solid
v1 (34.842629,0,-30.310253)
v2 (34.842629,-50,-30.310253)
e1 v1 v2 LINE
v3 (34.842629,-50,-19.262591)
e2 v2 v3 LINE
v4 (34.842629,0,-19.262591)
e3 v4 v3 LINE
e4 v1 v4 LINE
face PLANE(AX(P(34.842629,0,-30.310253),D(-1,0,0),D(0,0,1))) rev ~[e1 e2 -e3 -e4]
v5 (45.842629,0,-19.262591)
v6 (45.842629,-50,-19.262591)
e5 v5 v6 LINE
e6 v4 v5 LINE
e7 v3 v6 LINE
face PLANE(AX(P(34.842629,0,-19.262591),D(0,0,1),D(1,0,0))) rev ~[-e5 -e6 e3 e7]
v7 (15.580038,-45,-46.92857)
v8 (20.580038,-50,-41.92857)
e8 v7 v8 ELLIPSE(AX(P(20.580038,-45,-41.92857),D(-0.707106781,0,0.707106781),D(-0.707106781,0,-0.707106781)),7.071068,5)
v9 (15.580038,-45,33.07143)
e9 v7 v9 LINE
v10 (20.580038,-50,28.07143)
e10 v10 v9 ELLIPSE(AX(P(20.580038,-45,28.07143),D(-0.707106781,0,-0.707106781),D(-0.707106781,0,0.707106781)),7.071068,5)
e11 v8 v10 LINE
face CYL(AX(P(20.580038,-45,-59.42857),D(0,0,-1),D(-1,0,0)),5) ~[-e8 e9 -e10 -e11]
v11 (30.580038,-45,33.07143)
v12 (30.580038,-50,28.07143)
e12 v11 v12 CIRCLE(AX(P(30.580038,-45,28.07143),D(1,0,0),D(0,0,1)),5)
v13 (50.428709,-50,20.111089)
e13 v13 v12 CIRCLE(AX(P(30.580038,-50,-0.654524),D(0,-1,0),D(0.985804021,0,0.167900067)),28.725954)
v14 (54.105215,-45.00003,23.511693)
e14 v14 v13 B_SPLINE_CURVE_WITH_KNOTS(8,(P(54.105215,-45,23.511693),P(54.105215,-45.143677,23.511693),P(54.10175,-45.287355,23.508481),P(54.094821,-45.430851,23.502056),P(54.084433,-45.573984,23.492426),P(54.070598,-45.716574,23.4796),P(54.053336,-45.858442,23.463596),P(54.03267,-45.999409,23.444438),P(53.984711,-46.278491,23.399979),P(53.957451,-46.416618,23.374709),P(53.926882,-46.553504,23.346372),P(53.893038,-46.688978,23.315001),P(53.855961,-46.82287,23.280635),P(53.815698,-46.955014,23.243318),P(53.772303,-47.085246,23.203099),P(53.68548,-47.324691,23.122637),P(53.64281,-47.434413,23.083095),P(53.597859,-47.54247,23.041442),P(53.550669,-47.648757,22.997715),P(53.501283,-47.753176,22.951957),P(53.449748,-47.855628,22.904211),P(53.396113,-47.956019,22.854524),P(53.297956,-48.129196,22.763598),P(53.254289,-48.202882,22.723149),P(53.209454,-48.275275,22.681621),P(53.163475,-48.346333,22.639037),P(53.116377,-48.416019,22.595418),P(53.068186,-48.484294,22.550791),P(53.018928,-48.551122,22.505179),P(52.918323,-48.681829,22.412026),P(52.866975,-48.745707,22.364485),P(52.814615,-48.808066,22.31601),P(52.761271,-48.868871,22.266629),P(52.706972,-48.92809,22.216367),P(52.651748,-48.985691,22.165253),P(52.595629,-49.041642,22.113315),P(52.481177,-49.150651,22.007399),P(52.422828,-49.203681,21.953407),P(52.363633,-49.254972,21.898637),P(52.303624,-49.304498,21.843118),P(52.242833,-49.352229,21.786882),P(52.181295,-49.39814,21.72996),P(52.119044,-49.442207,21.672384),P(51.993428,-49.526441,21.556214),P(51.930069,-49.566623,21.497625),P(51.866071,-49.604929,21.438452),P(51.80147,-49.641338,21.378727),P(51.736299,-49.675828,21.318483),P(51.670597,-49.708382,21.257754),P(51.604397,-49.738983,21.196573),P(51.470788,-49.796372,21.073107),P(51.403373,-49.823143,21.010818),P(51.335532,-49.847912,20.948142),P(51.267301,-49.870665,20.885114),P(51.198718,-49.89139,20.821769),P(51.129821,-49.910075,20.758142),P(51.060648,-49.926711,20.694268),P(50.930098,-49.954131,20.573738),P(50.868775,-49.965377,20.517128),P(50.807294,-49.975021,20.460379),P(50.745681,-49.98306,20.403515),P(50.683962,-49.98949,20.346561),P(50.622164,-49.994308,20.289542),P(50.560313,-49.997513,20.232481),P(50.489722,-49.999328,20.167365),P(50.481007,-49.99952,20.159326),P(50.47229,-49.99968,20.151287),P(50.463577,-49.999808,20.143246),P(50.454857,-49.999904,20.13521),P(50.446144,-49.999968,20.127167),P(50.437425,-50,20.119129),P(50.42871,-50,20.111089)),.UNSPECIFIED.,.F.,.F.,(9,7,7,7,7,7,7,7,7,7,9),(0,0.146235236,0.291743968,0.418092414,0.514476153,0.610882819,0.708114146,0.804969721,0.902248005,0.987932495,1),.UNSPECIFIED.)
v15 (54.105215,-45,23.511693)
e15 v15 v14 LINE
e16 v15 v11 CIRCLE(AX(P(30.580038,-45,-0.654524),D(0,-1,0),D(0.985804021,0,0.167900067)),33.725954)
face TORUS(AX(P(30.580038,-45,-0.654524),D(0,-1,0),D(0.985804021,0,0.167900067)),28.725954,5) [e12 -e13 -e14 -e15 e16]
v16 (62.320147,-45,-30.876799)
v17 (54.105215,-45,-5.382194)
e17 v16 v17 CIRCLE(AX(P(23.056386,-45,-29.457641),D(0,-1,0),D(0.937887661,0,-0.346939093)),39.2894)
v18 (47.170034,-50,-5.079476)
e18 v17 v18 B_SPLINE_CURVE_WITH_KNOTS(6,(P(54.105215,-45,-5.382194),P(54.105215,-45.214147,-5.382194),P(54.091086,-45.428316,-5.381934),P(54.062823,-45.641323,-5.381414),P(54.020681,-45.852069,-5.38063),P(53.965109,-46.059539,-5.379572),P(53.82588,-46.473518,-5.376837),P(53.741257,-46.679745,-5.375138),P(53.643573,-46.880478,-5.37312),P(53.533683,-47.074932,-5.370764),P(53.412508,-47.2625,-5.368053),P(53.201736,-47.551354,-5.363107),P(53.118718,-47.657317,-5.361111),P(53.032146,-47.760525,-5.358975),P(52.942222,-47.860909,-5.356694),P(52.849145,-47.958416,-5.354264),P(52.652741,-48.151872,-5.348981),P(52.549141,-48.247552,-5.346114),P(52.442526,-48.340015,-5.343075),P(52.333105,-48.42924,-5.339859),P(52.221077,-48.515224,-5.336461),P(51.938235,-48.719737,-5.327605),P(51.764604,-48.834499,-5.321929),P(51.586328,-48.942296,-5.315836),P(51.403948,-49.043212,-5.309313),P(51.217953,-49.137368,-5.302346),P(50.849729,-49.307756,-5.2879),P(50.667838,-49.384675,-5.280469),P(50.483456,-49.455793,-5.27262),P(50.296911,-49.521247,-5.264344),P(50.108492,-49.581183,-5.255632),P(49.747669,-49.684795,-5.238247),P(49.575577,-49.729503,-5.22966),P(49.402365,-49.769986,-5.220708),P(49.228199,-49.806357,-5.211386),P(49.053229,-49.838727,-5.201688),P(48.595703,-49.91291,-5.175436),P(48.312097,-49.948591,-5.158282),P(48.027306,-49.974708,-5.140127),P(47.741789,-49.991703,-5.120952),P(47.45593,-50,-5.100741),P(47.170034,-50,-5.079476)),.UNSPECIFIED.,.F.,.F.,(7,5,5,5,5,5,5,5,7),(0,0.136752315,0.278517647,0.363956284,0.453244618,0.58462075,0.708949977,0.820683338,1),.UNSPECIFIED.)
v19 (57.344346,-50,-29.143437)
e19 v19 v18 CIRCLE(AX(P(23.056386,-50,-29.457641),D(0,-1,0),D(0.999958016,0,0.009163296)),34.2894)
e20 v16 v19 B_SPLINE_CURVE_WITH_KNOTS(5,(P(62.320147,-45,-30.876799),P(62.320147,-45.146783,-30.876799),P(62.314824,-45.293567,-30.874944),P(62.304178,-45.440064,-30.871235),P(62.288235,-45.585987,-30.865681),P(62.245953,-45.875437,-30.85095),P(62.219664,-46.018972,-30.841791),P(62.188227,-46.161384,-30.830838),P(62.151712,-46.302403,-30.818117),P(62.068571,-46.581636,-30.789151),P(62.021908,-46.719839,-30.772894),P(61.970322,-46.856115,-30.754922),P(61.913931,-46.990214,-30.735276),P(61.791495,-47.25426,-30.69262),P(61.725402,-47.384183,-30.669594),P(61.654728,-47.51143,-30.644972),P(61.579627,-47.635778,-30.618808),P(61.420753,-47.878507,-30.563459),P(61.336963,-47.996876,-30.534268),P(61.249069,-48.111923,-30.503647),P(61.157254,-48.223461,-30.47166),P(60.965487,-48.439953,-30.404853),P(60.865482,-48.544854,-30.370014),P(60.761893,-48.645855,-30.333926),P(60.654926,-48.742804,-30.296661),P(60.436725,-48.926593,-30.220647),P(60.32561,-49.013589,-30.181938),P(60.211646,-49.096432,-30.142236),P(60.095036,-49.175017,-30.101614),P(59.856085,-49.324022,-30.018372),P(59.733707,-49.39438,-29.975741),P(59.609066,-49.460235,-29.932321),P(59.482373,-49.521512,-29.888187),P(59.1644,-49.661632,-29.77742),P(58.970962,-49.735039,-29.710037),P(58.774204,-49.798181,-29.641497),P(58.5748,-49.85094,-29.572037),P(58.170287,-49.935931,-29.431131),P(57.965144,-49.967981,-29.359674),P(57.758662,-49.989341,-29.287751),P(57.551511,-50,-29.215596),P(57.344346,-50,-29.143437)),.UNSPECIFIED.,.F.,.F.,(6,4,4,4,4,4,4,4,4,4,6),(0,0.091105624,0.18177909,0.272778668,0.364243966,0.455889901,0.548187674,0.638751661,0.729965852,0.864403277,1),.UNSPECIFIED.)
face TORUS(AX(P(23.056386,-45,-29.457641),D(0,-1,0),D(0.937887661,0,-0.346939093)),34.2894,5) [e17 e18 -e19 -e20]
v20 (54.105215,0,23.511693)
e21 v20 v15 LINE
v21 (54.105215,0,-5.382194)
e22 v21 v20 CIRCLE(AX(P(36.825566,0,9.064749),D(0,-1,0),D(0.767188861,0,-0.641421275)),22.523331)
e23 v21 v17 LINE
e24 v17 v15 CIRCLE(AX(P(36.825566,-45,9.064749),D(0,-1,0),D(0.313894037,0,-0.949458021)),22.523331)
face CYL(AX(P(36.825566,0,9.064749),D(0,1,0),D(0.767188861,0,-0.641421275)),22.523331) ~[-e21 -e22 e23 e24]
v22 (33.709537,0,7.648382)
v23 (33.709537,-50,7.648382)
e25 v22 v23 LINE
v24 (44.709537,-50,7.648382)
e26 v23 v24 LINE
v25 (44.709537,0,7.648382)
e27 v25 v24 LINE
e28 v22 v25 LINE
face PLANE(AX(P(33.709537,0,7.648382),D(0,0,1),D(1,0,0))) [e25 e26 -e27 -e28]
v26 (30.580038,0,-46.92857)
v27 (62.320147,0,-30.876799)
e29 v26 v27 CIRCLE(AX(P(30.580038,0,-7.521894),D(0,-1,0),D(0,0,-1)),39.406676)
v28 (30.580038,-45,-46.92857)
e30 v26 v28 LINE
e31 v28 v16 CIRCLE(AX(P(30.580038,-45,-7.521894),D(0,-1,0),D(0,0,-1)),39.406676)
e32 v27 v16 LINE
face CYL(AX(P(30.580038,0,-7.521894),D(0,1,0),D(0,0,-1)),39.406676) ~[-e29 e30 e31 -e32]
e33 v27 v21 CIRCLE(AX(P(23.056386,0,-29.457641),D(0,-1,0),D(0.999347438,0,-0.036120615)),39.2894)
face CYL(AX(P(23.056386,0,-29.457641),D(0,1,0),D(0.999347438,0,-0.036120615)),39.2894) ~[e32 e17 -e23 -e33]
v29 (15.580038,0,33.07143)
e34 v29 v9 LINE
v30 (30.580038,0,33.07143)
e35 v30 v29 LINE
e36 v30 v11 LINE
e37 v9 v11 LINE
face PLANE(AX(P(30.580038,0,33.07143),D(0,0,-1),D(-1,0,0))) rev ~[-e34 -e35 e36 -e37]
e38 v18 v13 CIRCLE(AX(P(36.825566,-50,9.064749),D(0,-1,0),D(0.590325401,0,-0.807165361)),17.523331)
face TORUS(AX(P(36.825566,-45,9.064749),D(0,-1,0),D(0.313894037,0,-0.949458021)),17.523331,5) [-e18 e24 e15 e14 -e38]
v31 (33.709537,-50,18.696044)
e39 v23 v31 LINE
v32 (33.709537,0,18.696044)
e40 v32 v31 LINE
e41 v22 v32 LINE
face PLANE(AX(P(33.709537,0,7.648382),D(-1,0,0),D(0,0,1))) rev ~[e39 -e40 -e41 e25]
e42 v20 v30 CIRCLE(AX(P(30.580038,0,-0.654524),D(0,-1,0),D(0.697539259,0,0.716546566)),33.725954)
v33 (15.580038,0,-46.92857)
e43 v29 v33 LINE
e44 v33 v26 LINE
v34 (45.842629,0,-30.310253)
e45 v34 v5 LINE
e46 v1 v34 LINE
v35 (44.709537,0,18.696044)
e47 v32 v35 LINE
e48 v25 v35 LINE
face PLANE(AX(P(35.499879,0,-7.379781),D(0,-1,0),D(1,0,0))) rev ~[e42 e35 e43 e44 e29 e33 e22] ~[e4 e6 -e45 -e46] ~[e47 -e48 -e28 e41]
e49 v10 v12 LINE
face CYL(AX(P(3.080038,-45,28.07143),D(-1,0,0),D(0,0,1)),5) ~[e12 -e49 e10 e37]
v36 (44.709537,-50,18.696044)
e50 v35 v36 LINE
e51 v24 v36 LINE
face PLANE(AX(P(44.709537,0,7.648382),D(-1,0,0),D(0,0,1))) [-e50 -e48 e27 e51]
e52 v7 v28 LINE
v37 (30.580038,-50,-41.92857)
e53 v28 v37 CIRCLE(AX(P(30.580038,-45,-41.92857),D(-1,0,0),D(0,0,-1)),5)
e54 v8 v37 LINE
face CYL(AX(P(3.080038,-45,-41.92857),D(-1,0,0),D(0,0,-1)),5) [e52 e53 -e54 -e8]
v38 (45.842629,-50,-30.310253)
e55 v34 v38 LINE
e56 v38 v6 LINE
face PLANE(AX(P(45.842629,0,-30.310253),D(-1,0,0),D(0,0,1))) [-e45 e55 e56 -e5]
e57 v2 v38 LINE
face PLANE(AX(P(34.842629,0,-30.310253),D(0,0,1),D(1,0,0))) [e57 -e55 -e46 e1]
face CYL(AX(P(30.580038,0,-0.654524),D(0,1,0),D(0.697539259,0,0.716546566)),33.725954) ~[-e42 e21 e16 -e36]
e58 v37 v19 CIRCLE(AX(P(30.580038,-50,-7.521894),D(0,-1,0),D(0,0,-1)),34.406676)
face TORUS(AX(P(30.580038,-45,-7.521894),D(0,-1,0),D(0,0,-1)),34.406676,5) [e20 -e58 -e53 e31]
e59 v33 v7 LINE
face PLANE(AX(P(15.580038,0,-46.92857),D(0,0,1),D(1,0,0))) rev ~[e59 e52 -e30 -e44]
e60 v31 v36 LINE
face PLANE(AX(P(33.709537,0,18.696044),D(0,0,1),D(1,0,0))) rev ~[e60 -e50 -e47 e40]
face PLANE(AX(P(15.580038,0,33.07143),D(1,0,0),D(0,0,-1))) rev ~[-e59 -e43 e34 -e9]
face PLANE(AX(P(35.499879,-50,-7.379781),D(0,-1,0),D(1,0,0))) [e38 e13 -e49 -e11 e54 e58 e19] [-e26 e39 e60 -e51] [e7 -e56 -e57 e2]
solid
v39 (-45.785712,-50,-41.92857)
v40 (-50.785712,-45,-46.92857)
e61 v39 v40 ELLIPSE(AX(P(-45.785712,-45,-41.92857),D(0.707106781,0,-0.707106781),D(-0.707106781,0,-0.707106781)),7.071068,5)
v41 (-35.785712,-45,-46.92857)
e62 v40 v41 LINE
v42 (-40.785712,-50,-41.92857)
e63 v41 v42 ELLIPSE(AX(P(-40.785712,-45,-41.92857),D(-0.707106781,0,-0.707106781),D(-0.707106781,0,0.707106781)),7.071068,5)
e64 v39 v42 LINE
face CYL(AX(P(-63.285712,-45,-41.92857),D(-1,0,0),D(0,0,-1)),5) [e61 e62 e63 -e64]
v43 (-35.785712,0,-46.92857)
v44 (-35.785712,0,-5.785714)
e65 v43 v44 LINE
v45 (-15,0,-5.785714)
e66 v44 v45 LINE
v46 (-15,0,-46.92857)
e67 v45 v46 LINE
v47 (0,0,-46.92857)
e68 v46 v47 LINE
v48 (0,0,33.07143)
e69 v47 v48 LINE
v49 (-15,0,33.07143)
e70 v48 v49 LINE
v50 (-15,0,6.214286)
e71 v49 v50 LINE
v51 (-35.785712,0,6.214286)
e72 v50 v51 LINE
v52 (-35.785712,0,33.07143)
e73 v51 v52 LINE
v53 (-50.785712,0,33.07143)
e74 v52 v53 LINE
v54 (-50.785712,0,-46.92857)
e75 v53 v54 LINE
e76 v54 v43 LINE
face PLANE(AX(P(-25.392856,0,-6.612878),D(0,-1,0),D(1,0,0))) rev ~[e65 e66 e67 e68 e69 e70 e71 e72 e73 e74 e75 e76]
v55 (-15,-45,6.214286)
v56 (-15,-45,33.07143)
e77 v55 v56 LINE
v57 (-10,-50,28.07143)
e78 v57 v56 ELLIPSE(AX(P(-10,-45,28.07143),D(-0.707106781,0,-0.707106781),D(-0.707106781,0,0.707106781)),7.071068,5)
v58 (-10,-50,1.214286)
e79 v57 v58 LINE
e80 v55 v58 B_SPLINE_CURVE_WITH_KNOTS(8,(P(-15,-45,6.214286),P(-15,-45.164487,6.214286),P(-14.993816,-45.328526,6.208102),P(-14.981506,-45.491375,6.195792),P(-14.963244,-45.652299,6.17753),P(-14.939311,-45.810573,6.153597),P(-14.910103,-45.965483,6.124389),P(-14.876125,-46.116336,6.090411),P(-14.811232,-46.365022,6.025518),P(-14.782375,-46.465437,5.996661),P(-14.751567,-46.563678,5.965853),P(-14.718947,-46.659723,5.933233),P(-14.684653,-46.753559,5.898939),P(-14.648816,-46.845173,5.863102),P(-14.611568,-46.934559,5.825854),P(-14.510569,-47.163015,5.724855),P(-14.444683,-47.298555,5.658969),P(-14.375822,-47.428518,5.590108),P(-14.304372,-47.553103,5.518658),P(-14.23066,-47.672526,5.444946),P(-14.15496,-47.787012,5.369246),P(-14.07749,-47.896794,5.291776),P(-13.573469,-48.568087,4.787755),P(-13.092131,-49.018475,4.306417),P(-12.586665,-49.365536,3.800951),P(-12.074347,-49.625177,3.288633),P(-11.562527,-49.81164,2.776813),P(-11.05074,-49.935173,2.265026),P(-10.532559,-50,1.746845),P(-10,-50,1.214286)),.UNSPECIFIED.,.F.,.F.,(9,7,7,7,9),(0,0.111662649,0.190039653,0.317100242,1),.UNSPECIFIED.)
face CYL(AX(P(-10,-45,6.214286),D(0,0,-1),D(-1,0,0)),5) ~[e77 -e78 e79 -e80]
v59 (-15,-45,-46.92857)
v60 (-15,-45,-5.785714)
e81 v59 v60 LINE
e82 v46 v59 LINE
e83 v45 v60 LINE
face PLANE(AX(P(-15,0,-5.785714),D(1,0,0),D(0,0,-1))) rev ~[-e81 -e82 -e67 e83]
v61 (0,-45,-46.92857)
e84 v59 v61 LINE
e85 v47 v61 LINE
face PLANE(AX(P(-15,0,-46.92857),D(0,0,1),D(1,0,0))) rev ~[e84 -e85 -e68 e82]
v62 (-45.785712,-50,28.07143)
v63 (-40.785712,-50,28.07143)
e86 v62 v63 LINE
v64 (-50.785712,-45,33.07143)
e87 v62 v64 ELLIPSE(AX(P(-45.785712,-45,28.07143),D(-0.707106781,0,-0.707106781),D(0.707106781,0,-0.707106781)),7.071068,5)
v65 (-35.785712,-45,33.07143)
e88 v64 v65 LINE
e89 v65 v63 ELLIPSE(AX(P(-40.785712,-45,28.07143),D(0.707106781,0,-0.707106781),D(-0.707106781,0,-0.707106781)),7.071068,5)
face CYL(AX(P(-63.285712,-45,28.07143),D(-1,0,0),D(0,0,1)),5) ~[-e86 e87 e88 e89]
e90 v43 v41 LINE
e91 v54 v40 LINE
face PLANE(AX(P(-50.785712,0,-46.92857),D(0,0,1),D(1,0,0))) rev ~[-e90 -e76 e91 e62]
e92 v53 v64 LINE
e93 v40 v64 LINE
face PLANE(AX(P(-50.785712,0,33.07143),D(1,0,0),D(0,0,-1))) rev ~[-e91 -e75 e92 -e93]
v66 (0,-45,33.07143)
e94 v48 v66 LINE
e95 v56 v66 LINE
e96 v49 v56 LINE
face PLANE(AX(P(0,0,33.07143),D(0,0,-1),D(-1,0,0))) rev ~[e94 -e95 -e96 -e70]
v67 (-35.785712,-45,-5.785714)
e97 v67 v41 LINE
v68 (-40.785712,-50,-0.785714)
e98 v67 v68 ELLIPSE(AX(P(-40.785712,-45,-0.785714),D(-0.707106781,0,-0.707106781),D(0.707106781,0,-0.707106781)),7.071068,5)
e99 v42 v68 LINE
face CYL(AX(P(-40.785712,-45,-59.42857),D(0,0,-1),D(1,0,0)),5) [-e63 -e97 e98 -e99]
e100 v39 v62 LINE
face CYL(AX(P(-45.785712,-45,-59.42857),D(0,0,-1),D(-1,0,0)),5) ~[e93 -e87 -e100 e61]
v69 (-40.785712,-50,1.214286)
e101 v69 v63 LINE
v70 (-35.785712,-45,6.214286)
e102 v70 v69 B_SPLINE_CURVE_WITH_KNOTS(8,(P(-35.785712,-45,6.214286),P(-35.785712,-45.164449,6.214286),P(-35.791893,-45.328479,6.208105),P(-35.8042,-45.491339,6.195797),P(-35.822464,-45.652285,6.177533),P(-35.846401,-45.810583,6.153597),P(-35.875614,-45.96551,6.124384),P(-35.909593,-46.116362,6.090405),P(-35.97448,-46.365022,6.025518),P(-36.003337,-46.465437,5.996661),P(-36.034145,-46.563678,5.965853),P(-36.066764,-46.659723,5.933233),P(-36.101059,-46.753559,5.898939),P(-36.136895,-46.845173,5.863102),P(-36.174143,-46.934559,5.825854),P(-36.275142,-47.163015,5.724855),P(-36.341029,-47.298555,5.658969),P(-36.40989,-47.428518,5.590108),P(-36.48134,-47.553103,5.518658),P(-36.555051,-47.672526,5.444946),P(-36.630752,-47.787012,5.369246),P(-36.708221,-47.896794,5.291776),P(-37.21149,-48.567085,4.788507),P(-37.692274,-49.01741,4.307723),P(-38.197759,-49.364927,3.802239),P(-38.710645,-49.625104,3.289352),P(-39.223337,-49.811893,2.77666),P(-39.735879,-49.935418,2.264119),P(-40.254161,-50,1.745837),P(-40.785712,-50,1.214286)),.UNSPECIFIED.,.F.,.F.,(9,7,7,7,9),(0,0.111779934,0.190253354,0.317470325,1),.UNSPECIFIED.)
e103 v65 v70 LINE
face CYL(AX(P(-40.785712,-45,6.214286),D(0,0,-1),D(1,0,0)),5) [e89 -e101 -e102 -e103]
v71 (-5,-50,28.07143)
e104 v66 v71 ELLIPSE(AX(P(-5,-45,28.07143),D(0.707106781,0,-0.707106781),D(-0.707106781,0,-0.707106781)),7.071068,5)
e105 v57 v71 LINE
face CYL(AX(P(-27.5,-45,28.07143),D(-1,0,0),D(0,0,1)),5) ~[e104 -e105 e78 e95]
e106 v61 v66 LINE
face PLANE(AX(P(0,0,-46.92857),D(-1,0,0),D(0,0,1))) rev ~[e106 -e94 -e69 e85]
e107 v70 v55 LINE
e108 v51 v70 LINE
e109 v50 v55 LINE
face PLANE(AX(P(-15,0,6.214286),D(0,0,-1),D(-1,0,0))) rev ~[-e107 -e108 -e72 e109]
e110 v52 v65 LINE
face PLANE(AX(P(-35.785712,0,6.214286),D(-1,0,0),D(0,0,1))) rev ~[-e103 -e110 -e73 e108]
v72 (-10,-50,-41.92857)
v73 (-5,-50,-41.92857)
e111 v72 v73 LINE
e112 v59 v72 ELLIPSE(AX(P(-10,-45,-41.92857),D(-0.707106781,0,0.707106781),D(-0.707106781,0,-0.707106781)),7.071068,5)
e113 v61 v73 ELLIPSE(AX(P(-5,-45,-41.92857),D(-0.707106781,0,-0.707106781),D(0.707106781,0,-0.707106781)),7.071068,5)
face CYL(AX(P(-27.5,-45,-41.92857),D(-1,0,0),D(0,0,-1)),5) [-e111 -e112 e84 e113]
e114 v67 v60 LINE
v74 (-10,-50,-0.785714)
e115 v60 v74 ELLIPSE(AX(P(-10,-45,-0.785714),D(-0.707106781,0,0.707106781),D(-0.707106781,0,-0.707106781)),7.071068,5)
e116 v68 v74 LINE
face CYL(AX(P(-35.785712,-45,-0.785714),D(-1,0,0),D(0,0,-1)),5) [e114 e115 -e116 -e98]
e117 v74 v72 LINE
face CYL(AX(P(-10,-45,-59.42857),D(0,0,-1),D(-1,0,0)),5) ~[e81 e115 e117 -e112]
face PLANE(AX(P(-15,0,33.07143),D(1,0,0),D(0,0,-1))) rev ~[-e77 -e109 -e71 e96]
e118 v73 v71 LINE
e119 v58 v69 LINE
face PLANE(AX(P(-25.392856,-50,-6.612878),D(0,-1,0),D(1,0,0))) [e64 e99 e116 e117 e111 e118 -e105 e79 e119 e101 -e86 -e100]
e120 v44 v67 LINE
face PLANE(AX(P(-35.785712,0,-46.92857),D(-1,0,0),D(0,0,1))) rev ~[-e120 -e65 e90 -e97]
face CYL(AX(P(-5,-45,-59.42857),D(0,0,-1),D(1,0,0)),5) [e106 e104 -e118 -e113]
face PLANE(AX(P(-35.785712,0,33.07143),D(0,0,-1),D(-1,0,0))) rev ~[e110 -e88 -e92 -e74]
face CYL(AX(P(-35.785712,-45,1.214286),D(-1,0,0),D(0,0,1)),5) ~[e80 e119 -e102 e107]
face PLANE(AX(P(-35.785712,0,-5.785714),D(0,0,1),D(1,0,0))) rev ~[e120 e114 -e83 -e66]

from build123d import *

# Parameters (mm, degrees)
F1_DEPTH       = 50
F0_W           = 11
F0_H           = 11.0476613045
F0_H_2         = 11.0476617701
F2_T1_DEPTH    = 105
F2_T3_DEPTH    = 40
F2_T5_DEPTH    = 39.3571444373
F2_T7_DEPTH    = 40
F2_T9_DEPTH    = 53.6428555627
F2_T11_DEPTH   = 20.7857115482
F2_T16_DEPTH   = 51.8571444373
F2_T21_DEPTH   = 66.1428555627
F2_T26_DEPTH   = 66.1428555627
F2_T31_DEPTH   = 51.8571444373
F2_T37_DEPTH   = 51.8571444373
F2_T42_DEPTH   = 33.2857115482
F2_T49_DEPTH   = 66.1428555627
F2_T54_DEPTH   = 33.2857115482
F2_T61_DEPTH   = 33.2857115482
F2_T65_DEPTH   = 66.1428555627
F2_T73_DEPTH   = 51.8571444373
F2_T78_DEPTH   = 33.2857115482
F2_2_T1_DEPTH  = 27.5
F2_2_T3_DEPTH  = 105
F2_2_T6_ANGLE  = 80.3342530923
F2_2_T10_ANGLE = 143.4118786012
F2_2_S11_R     = 39.2893999544
F2_2_T12_DEPTH = 27
F2_2_T16_ANGLE = 76.3206243735
F2_2_S17_R     = 22.5233307718
F2_2_T18_DEPTH = 29
F2_2_T20_ANGLE = 71.8308511896
F2_2_T25_ANGLE = 76.3206243735
F2_2_S26_R     = 22.5233307718
F2_2_T27_DEPTH = 29
F2_2_T30_ANGLE = 143.4118786012
F2_2_S31_R     = 39.2893999544
F2_2_T32_DEPTH = 27


# Not quite as in the source:
# - a fillet or chamfer that OpenCascade refuses, or shapes differently, is made with other operations: its cross-section is extruded or revolved along the edge and cut away or added


with BuildPart() as f1:
    # F0 (on Front) → F1 (new body)
    with BuildSketch(Plane.XZ):
        Polygon((-35.7857115482, 33.0714304233), (-50.7857115482, 33.0714304233), (-50.7857115482, -46.9285695767), (-35.7857115482, -46.9285695767), (-35.7857115482, -5.785714014), (-15, -5.785714014), (-15, -46.9285695767), (0, -46.9285695767), (0, 33.0714304233), (-15, 33.0714304233), (-15, 6.214285986), (-35.7857115482, 6.214285986), align=None)
    extrude(amount=F1_DEPTH)

    # F2: fillet of radius 5 on 12 edges, made by hand

    # F2_s2 → F2_t1 (cut)
    with BuildSketch(Plane.XY.offset(-59.4285695767)):
        with BuildLine():
            ThreePointArc((0, -45), (-1.4644660941, -48.5355339059), (-5, -50))
            Line((-5, -50), (0, -50))
            Line((0, -50), (0, -45))
        make_face()
        with BuildLine():
            ThreePointArc((-50.7857115482, -45), (-49.3212454541, -48.5355339059), (-45.7857115482, -50))
            Line((-45.7857115482, -50), (-50.7857115482, -50))
            Line((-50.7857115482, -50), (-50.7857115482, -45))
        make_face()
    extrude(amount=F2_T1_DEPTH, mode=Mode.SUBTRACT)

    # F2_s4 → F2_t3 (cut)
    with BuildSketch(Plane.YZ.offset(-27.5)):
        with BuildLine():
            ThreePointArc((-45, 33.0714304233), (-48.5355339059, 31.6069643292), (-50, 28.0714304233))
            Line((-50, 28.0714304233), (-50, 33.0714304233))
            Line((-50, 33.0714304233), (-45, 33.0714304233))
        make_face()
        with BuildLine():
            ThreePointArc((-45, -46.9285695767), (-48.5355339059, -45.4641034826), (-50, -41.9285695767))
            Line((-50, -41.9285695767), (-50, -46.9285695767))
            Line((-50, -46.9285695767), (-45, -46.9285695767))
        make_face()
    extrude(amount=F2_T3_DEPTH, mode=Mode.SUBTRACT)

    # F2_s6 → F2_t5 (cut)
    with BuildSketch(Plane.XY.offset(6.214285986)):
        with BuildLine():
            ThreePointArc((-35.7857115482, -45), (-37.2501776423, -48.5355339059), (-40.7857115482, -50))
            Line((-40.7857115482, -50), (-35.7857115482, -50))
            Line((-35.7857115482, -50), (-35.7857115482, -45))
        make_face()
        with BuildLine():
            ThreePointArc((-15, -45), (-13.5355339059, -48.5355339059), (-10, -50))
            Line((-10, -50), (-15, -50))
            Line((-15, -50), (-15, -45))
        make_face()
    extrude(amount=F2_T5_DEPTH, mode=Mode.SUBTRACT)

    # F2_s8 → F2_t7 (cut)
    with BuildSketch(Plane.YZ.offset(-63.2857115482)):
        with BuildLine():
            ThreePointArc((-45, 33.0714304233), (-48.5355339059, 31.6069643292), (-50, 28.0714304233))
            Line((-50, 28.0714304233), (-50, 33.0714304233))
            Line((-50, 33.0714304233), (-45, 33.0714304233))
        make_face()
        with BuildLine():
            ThreePointArc((-45, -46.9285695767), (-48.5355339059, -45.4641034826), (-50, -41.9285695767))
            Line((-50, -41.9285695767), (-50, -46.9285695767))
            Line((-50, -46.9285695767), (-45, -46.9285695767))
        make_face()
    extrude(amount=F2_T7_DEPTH, mode=Mode.SUBTRACT)

    # F2_s10 → F2_t9 (cut)
    with BuildSketch(Plane.XY.offset(-59.4285695767)):
        with BuildLine():
            ThreePointArc((-35.7857115482, -45), (-37.2501776423, -48.5355339059), (-40.7857115482, -50))
            Line((-40.7857115482, -50), (-35.7857115482, -50))
            Line((-35.7857115482, -50), (-35.7857115482, -45))
        make_face()
        with BuildLine():
            ThreePointArc((-15, -45), (-13.5355339059, -48.5355339059), (-10, -50))
            Line((-10, -50), (-15, -50))
            Line((-15, -50), (-15, -45))
        make_face()
    extrude(amount=F2_T9_DEPTH, mode=Mode.SUBTRACT)

    # F2_s12 → F2_t11 (cut)
    with BuildSketch(Plane.YZ.offset(-35.7857115482)):
        with BuildLine():
            ThreePointArc((-45, -5.785714014), (-48.5355339059, -4.3212479199), (-50, -0.785714014))
            Line((-50, -0.785714014), (-50, -5.785714014))
            Line((-50, -5.785714014), (-45, -5.785714014))
        make_face()
        with BuildLine():
            ThreePointArc((-45, 6.214285986), (-48.5355339059, 4.749819892), (-50, 1.214285986))
            Line((-50, 1.214285986), (-50, 6.214285986))
            Line((-50, 6.214285986), (-45, 6.214285986))
        make_face()
    extrude(amount=F2_T11_DEPTH, mode=Mode.SUBTRACT)


with BuildPart() as f1b:
    # F0 (on Front) → F1, piece 2 (new body)
    with BuildSketch(Plane.XZ):
        with BuildLine():
            Line((30.5800376087, 33.0714304233), (15.5800376087, 33.0714304233))
            Line((15.5800376087, 33.0714304233), (15.5800376087, -46.9285695767))
            Line((15.5800376087, -46.9285695767), (30.5800376087, -46.9285695767))
            ThreePointArc((30.5800376087, -46.9285695767), (48.3641167152, -42.6873971764), (62.3201467097, -30.8767985553))
            ThreePointArc((62.3201467097, -30.8767985553), (60.4523586567, -17.4078220357), (54.1052147746, -5.3821941838))
            ThreePointArc((54.1052147746, -5.3821941838), (59.3488970656, 9.0647493489), (54.1052147746, 23.5116928816))
            ThreePointArc((54.1052147746, 23.5116928816), (43.2767157427, 30.5902254056), (30.5800376087, 33.0714304233))
        make_face()
        with Locations((40.3426289856, -24.7864220291)):
            Rectangle(F0_W, F0_H, mode=Mode.SUBTRACT)
        with Locations((39.2095372379, 13.1722127553)):
            Rectangle(F0_W, F0_H_2, mode=Mode.SUBTRACT)
    extrude(amount=F1_DEPTH)

    # F2#2: fillet of radius 5 on 7 edges, made by hand

    # F2_2_s2 → F2_2_t1 (cut)
    with BuildSketch(Plane.YZ.offset(3.0800376087)):
        with BuildLine():
            ThreePointArc((-45, -46.9285695767), (-48.5355339059, -45.4641034826), (-50, -41.9285695767))
            Line((-50, -41.9285695767), (-50, -46.9285695767))
            Line((-50, -46.9285695767), (-45, -46.9285695767))
        make_face()
        with BuildLine():
            ThreePointArc((-45, 33.0714304233), (-48.5355339059, 31.6069643292), (-50, 28.0714304233))
            Line((-50, 28.0714304233), (-50, 33.0714304233))
            Line((-50, 33.0714304233), (-45, 33.0714304233))
        make_face()
    extrude(amount=F2_2_T1_DEPTH, mode=Mode.SUBTRACT)

    # F2_2_s4 → F2_2_t3 (cut)
    with BuildSketch(Plane.XY.offset(-59.4285695767)):
        with BuildLine():
            ThreePointArc((15.5800376087, -45), (17.0445037028, -48.5355339059), (20.5800376087, -50))
            Line((20.5800376087, -50), (15.5800376087, -50))
            Line((15.5800376087, -50), (15.5800376087, -45))
        make_face()
    extrude(amount=F2_2_T3_DEPTH, mode=Mode.SUBTRACT)

    # F2_2_s5 → F2_2_t6 (revolve, cut)
    with BuildSketch(Plane(origin=(0.9703990257, 0, -5.6975752164), x_dir=(0, 1, 0), z_dir=(0.1679000671, 0, -0.9858040208))):
        with BuildLine():
            ThreePointArc((-45, 63.7619837133), (-48.5355339059, 62.2975176192), (-50, 58.7619837133))
            Line((-50, 58.7619837133), (-50, 63.7619837133))
            Line((-50, 63.7619837133), (-45, 63.7619837133))
        make_face()
    revolve(axis=Axis((30.5800376087, -50, -0.6545238583), (0, -1, 0)), revolution_arc=F2_2_T6_ANGLE, mode=Mode.SUBTRACT)


with BuildPart() as f2_tool14:
    # F2_s15 → F2_t16 (new body)
    with BuildSketch(Plane.XY.offset(-6.285714014)):
        with BuildLine():
            ThreePointArc((-35.7857115482, -45), (-37.2501776423, -48.5355339059), (-40.7857115482, -50))
            Line((-40.7857115482, -50), (-35.7857115482, -50))
            Line((-35.7857115482, -50), (-35.7857115482, -45))
        make_face()
    extrude(amount=F2_T16_DEPTH)

    split(bisect_by=Plane.XY.offset(-5.785714014), keep=Keep.BOTTOM)


with BuildPart() as f1_1:
    add(f1.part)

    # F2_t13: cut F2_tool14
    add(f2_tool14.part, mode=Mode.SUBTRACT)


with BuildPart() as f2_tool19:
    # F2_s20 → F2_t21 (new body)
    with BuildSketch(Plane.XY.offset(-59.4285695767)):
        with BuildLine():
            ThreePointArc((-35.7857115482, -45), (-37.2501776423, -48.5355339059), (-40.7857115482, -50))
            Line((-40.7857115482, -50), (-35.7857115482, -50))
            Line((-35.7857115482, -50), (-35.7857115482, -45))
        make_face()
    extrude(amount=F2_T21_DEPTH)

    split(bisect_by=Plane.XY.offset(6.214285986), keep=Keep.TOP)


with BuildPart() as f1_2:
    add(f1_1.part)

    # F2_t18: cut F2_tool19
    add(f2_tool19.part, mode=Mode.SUBTRACT)


with BuildPart() as f2_tool24:
    # F2_s25 → F2_t26 (new body)
    with BuildSketch(Plane.XY.offset(6.714285986)):
        with BuildLine():
            ThreePointArc((-15, -45), (-13.5355339059, -48.5355339059), (-10, -50))
            Line((-10, -50), (-15, -50))
            Line((-15, -50), (-15, -45))
        make_face()
    extrude(amount=-F2_T26_DEPTH)

    split(bisect_by=Plane.XY.offset(6.214285986), keep=Keep.TOP)


with BuildPart() as f1_3:
    add(f1_2.part)

    # F2_t23: cut F2_tool24
    add(f2_tool24.part, mode=Mode.SUBTRACT)


with BuildPart() as f2_tool29:
    # F2_s30 → F2_t31 (new body)
    with BuildSketch(Plane.XY.offset(45.5714304233)):
        with BuildLine():
            ThreePointArc((-15, -45), (-13.5355339059, -48.5355339059), (-10, -50))
            Line((-10, -50), (-15, -50))
            Line((-15, -50), (-15, -45))
        make_face()
    extrude(amount=-F2_T31_DEPTH)

    split(bisect_by=Plane.XY.offset(-5.785714014), keep=Keep.BOTTOM)


with BuildPart() as f1_4:
    add(f1_3.part)

    # F2_t28: cut F2_tool29
    add(f2_tool29.part, mode=Mode.SUBTRACT)


with BuildPart() as f2_tool35:
    # F2_s36 → F2_t37 (new body)
    with BuildSketch(Plane.XY.offset(-6.285714014)):
        with BuildLine():
            ThreePointArc((-35.7857115482, -45), (-37.2501776423, -48.5355339059), (-40.7857115482, -50))
            Line((-40.7857115482, -50), (-35.7857115482, -50))
            Line((-35.7857115482, -50), (-35.7857115482, -45))
        make_face()
    extrude(amount=F2_T37_DEPTH)

    split(bisect_by=Plane.XY.offset(6.214285986), keep=Keep.BOTTOM)

    split(bisect_by=Plane.XY.offset(-5.785714014), keep=Keep.TOP)


with BuildPart() as f2_tool40:
    # F2_s41 → F2_t42 (new body)
    with BuildSketch(Plane.YZ.offset(-15)):
        with BuildLine():
            ThreePointArc((-45, 6.214285986), (-48.5355339059, 4.749819892), (-50, 1.214285986))
            Line((-50, 1.214285986), (-50, 6.214285986))
            Line((-50, 6.214285986), (-45, 6.214285986))
        make_face()
    extrude(amount=-F2_T42_DEPTH)

    split(bisect_by=Plane.YZ.offset(-35.7857115482), keep=Keep.BOTTOM)


with BuildPart() as f2_tool35_1:
    add(f2_tool35.part)

    # F2_t44: intersect F2_tool40
    add(f2_tool40.part, mode=Mode.INTERSECT)


with BuildPart() as f1_5:
    add(f1_4.part)

    # F2_t33: cut F2_tool35
    add(f2_tool35_1.part, mode=Mode.SUBTRACT)


with BuildPart() as f2_tool47:
    # F2_s48 → F2_t49 (new body)
    with BuildSketch(Plane.XY.offset(-59.4285695767)):
        with BuildLine():
            ThreePointArc((-35.7857115482, -45), (-37.2501776423, -48.5355339059), (-40.7857115482, -50))
            Line((-40.7857115482, -50), (-35.7857115482, -50))
            Line((-35.7857115482, -50), (-35.7857115482, -45))
        make_face()
    extrude(amount=F2_T49_DEPTH)

    split(bisect_by=Plane.XY.offset(6.214285986), keep=Keep.BOTTOM)

    split(bisect_by=Plane.XY.offset(-5.785714014), keep=Keep.TOP)


with BuildPart() as f2_tool52:
    # F2_s53 → F2_t54 (new body)
    with BuildSketch(Plane.YZ.offset(-48.2857115482)):
        with BuildLine():
            ThreePointArc((-45, -5.785714014), (-48.5355339059, -4.3212479199), (-50, -0.785714014))
            Line((-50, -0.785714014), (-50, -5.785714014))
            Line((-50, -5.785714014), (-45, -5.785714014))
        make_face()
    extrude(amount=F2_T54_DEPTH)

    split(bisect_by=Plane.YZ.offset(-35.7857115482), keep=Keep.BOTTOM)


with BuildPart() as f2_tool47_1:
    add(f2_tool47.part)

    # F2_t56: intersect F2_tool52
    add(f2_tool52.part, mode=Mode.INTERSECT)


with BuildPart() as f1_6:
    add(f1_5.part)

    # F2_t45: cut F2_tool47
    add(f2_tool47_1.part, mode=Mode.SUBTRACT)


with BuildPart() as f2_tool59:
    # F2_s60 → F2_t61 (new body)
    with BuildSketch(Plane.YZ.offset(-35.7857115482)):
        with BuildLine():
            ThreePointArc((-45, -5.785714014), (-48.5355339059, -4.3212479199), (-50, -0.785714014))
            Line((-50, -0.785714014), (-50, -5.785714014))
            Line((-50, -5.785714014), (-45, -5.785714014))
        make_face()
    extrude(amount=F2_T61_DEPTH)

    split(bisect_by=Plane.YZ.offset(-15), keep=Keep.TOP)


with BuildPart() as f2_tool63:
    # F2_s64 → F2_t65 (new body)
    with BuildSketch(Plane.XY.offset(6.714285986)):
        with BuildLine():
            ThreePointArc((-15, -45), (-13.5355339059, -48.5355339059), (-10, -50))
            Line((-10, -50), (-15, -50))
            Line((-15, -50), (-15, -45))
        make_face()
    extrude(amount=-F2_T65_DEPTH)

    split(bisect_by=Plane.XY.offset(-5.785714014), keep=Keep.TOP)

    split(bisect_by=Plane.XY.offset(6.214285986), keep=Keep.BOTTOM)


with BuildPart() as f2_tool59_1:
    add(f2_tool59.part)

    # F2_t68: intersect F2_tool63
    add(f2_tool63.part, mode=Mode.INTERSECT)


with BuildPart() as f1_7:
    add(f1_6.part)

    # F2_t57: cut F2_tool59
    add(f2_tool59_1.part, mode=Mode.SUBTRACT)


with BuildPart() as f2_tool71:
    # F2_s72 → F2_t73 (new body)
    with BuildSketch(Plane.XY.offset(45.5714304233)):
        with BuildLine():
            ThreePointArc((-15, -45), (-13.5355339059, -48.5355339059), (-10, -50))
            Line((-10, -50), (-15, -50))
            Line((-15, -50), (-15, -45))
        make_face()
    extrude(amount=-F2_T73_DEPTH)

    split(bisect_by=Plane.XY.offset(-5.785714014), keep=Keep.TOP)

    split(bisect_by=Plane.XY.offset(6.214285986), keep=Keep.BOTTOM)


with BuildPart() as f2_tool76:
    # F2_s77 → F2_t78 (new body)
    with BuildSketch(Plane.YZ.offset(-2.5)):
        with BuildLine():
            ThreePointArc((-45, 6.214285986), (-48.5355339059, 4.749819892), (-50, 1.214285986))
            Line((-50, 1.214285986), (-50, 6.214285986))
            Line((-50, 6.214285986), (-45, 6.214285986))
        make_face()
    extrude(amount=-F2_T78_DEPTH)

    split(bisect_by=Plane.YZ.offset(-15), keep=Keep.TOP)


with BuildPart() as f2_tool71_1:
    add(f2_tool71.part)

    # F2_t80: intersect F2_tool76
    add(f2_tool76.part, mode=Mode.INTERSECT)


with BuildPart() as f1_8:
    add(f1_7.part)

    # F2_t69: cut F2_tool71
    add(f2_tool71_1.part, mode=Mode.SUBTRACT)


with BuildPart() as f2_2_tool8:
    # F2_2_s9 → F2_2_t10 (revolve)
    with BuildSketch(Plane(origin=(35.8987230001, 0, 11.8682393716), x_dir=(0, 1, 0), z_dir=(-0.9494580211, 0, -0.3138940365))):
        with BuildLine():
            ThreePointArc((-45, 25.4760574436), (-48.5355339059, 24.0115913495), (-50, 20.4760574436))
            Line((-50, 20.4760574436), (-50, 25.4760574436))
            Line((-50, 25.4760574436), (-45, 25.4760574436))
        make_face()
    revolve(axis=Axis((36.8255662938, -50, 9.0647493489), (0, -1, 0)), revolution_arc=F2_2_T10_ANGLE)

    # F2_2_s11 → F2_2_t12 (cut, symmetric)
    with BuildSketch(Plane.XZ.offset(47.5)):
        with Locations((23.056385538, -29.4576412578)):
            Circle(F2_2_S11_R)
    extrude(amount=F2_2_T12_DEPTH, both=True, mode=Mode.SUBTRACT)


with BuildPart() as f1b_1:
    add(f1b.part)

    # F2_2_t7: cut F2_2_tool8
    add(f2_2_tool8.part, mode=Mode.SUBTRACT)


with BuildPart() as f2_2_tool14:
    # F2_2_s15 → F2_2_t16 (revolve)
    with BuildSketch(Plane(origin=(-6.8099969571, 0, -18.4096063069), x_dir=(0, 1, 0), z_dir=(-0.3469390933, 0, -0.9378876615))):
        with BuildLine():
            ThreePointArc((-45, 71.133706818), (-48.5355339059, 69.669240724), (-50, 66.133706818))
            Line((-50, 66.133706818), (-50, 71.133706818))
            Line((-50, 71.133706818), (-45, 71.133706818))
        make_face()
    revolve(axis=Axis((23.056385538, -50, -29.4576412578), (0, -1, 0)), revolution_arc=F2_2_T16_ANGLE)

    # F2_2_s17 → F2_2_t18 (cut, symmetric)
    with BuildSketch(Plane.XZ.offset(47.5)):
        with Locations((36.8255662938, 9.0647493489)):
            Circle(F2_2_S17_R)
    extrude(amount=F2_2_T18_DEPTH, both=True, mode=Mode.SUBTRACT)


with BuildPart() as f1b_2:
    add(f1b_1.part)

    # F2_2_t13: cut F2_2_tool14
    add(f2_2_tool14.part, mode=Mode.SUBTRACT)

    # F2_2_s19 → F2_2_t20 (revolve, cut)
    with BuildSketch(Plane.YZ.offset(30.5800376087)):
        with BuildLine():
            ThreePointArc((-45, -46.9285695767), (-48.5355339059, -45.4641034826), (-50, -41.9285695767))
            Line((-50, -41.9285695767), (-50, -46.9285695767))
            Line((-50, -46.9285695767), (-45, -46.9285695767))
        make_face()
    revolve(axis=Axis((30.5800376087, -50, -7.5218936101), (0, -1, 0)), revolution_arc=F2_2_T20_ANGLE, mode=Mode.SUBTRACT)


with BuildPart() as f2_2_tool23:
    # F2_2_s24 → F2_2_t25 (revolve)
    with BuildSketch(Plane(origin=(-6.8099969571, 0, -18.4096063069), x_dir=(0, 1, 0), z_dir=(-0.3469390933, 0, -0.9378876615))):
        with BuildLine():
            ThreePointArc((-45, 71.133706818), (-48.5355339059, 69.669240724), (-50, 66.133706818))
            Line((-50, 66.133706818), (-50, 71.133706818))
            Line((-50, 71.133706818), (-45, 71.133706818))
        make_face()
    revolve(axis=Axis((23.056385538, -50, -29.4576412578), (0, -1, 0)), revolution_arc=F2_2_T25_ANGLE)

    # F2_2_s26 → F2_2_t27 (intersect, symmetric)
    with BuildSketch(Plane.XZ.offset(47.5)):
        with Locations((36.8255662938, 9.0647493489)):
            Circle(F2_2_S26_R)
    extrude(amount=F2_2_T27_DEPTH, both=True, mode=Mode.INTERSECT)


with BuildPart() as f2_2_tool28:
    # F2_2_s29 → F2_2_t30 (revolve)
    with BuildSketch(Plane(origin=(35.8987230001, 0, 11.8682393716), x_dir=(0, 1, 0), z_dir=(-0.9494580211, 0, -0.3138940365))):
        with BuildLine():
            ThreePointArc((-45, 25.4760574436), (-48.5355339059, 24.0115913495), (-50, 20.4760574436))
            Line((-50, 20.4760574436), (-50, 25.4760574436))
            Line((-50, 25.4760574436), (-45, 25.4760574436))
        make_face()
    revolve(axis=Axis((36.8255662938, -50, 9.0647493489), (0, -1, 0)), revolution_arc=F2_2_T30_ANGLE)

    # F2_2_s31 → F2_2_t32 (intersect, symmetric)
    with BuildSketch(Plane.XZ.offset(47.5)):
        with Locations((23.056385538, -29.4576412578)):
            Circle(F2_2_S31_R)
    extrude(amount=F2_2_T32_DEPTH, both=True, mode=Mode.INTERSECT)


with BuildPart() as f2_2_tool23_1:
    add(f2_2_tool23.part)

    # F2_2_t33: intersect F2_2_tool28
    add(f2_2_tool28.part, mode=Mode.INTERSECT)


with BuildPart() as f1b_3:
    add(f1b_2.part)

    # F2_2_t21: cut F2_2_tool23
    add(f2_2_tool23_1.part, mode=Mode.SUBTRACT)


solid = Compound([f1_8.part, f1b_3.part])
